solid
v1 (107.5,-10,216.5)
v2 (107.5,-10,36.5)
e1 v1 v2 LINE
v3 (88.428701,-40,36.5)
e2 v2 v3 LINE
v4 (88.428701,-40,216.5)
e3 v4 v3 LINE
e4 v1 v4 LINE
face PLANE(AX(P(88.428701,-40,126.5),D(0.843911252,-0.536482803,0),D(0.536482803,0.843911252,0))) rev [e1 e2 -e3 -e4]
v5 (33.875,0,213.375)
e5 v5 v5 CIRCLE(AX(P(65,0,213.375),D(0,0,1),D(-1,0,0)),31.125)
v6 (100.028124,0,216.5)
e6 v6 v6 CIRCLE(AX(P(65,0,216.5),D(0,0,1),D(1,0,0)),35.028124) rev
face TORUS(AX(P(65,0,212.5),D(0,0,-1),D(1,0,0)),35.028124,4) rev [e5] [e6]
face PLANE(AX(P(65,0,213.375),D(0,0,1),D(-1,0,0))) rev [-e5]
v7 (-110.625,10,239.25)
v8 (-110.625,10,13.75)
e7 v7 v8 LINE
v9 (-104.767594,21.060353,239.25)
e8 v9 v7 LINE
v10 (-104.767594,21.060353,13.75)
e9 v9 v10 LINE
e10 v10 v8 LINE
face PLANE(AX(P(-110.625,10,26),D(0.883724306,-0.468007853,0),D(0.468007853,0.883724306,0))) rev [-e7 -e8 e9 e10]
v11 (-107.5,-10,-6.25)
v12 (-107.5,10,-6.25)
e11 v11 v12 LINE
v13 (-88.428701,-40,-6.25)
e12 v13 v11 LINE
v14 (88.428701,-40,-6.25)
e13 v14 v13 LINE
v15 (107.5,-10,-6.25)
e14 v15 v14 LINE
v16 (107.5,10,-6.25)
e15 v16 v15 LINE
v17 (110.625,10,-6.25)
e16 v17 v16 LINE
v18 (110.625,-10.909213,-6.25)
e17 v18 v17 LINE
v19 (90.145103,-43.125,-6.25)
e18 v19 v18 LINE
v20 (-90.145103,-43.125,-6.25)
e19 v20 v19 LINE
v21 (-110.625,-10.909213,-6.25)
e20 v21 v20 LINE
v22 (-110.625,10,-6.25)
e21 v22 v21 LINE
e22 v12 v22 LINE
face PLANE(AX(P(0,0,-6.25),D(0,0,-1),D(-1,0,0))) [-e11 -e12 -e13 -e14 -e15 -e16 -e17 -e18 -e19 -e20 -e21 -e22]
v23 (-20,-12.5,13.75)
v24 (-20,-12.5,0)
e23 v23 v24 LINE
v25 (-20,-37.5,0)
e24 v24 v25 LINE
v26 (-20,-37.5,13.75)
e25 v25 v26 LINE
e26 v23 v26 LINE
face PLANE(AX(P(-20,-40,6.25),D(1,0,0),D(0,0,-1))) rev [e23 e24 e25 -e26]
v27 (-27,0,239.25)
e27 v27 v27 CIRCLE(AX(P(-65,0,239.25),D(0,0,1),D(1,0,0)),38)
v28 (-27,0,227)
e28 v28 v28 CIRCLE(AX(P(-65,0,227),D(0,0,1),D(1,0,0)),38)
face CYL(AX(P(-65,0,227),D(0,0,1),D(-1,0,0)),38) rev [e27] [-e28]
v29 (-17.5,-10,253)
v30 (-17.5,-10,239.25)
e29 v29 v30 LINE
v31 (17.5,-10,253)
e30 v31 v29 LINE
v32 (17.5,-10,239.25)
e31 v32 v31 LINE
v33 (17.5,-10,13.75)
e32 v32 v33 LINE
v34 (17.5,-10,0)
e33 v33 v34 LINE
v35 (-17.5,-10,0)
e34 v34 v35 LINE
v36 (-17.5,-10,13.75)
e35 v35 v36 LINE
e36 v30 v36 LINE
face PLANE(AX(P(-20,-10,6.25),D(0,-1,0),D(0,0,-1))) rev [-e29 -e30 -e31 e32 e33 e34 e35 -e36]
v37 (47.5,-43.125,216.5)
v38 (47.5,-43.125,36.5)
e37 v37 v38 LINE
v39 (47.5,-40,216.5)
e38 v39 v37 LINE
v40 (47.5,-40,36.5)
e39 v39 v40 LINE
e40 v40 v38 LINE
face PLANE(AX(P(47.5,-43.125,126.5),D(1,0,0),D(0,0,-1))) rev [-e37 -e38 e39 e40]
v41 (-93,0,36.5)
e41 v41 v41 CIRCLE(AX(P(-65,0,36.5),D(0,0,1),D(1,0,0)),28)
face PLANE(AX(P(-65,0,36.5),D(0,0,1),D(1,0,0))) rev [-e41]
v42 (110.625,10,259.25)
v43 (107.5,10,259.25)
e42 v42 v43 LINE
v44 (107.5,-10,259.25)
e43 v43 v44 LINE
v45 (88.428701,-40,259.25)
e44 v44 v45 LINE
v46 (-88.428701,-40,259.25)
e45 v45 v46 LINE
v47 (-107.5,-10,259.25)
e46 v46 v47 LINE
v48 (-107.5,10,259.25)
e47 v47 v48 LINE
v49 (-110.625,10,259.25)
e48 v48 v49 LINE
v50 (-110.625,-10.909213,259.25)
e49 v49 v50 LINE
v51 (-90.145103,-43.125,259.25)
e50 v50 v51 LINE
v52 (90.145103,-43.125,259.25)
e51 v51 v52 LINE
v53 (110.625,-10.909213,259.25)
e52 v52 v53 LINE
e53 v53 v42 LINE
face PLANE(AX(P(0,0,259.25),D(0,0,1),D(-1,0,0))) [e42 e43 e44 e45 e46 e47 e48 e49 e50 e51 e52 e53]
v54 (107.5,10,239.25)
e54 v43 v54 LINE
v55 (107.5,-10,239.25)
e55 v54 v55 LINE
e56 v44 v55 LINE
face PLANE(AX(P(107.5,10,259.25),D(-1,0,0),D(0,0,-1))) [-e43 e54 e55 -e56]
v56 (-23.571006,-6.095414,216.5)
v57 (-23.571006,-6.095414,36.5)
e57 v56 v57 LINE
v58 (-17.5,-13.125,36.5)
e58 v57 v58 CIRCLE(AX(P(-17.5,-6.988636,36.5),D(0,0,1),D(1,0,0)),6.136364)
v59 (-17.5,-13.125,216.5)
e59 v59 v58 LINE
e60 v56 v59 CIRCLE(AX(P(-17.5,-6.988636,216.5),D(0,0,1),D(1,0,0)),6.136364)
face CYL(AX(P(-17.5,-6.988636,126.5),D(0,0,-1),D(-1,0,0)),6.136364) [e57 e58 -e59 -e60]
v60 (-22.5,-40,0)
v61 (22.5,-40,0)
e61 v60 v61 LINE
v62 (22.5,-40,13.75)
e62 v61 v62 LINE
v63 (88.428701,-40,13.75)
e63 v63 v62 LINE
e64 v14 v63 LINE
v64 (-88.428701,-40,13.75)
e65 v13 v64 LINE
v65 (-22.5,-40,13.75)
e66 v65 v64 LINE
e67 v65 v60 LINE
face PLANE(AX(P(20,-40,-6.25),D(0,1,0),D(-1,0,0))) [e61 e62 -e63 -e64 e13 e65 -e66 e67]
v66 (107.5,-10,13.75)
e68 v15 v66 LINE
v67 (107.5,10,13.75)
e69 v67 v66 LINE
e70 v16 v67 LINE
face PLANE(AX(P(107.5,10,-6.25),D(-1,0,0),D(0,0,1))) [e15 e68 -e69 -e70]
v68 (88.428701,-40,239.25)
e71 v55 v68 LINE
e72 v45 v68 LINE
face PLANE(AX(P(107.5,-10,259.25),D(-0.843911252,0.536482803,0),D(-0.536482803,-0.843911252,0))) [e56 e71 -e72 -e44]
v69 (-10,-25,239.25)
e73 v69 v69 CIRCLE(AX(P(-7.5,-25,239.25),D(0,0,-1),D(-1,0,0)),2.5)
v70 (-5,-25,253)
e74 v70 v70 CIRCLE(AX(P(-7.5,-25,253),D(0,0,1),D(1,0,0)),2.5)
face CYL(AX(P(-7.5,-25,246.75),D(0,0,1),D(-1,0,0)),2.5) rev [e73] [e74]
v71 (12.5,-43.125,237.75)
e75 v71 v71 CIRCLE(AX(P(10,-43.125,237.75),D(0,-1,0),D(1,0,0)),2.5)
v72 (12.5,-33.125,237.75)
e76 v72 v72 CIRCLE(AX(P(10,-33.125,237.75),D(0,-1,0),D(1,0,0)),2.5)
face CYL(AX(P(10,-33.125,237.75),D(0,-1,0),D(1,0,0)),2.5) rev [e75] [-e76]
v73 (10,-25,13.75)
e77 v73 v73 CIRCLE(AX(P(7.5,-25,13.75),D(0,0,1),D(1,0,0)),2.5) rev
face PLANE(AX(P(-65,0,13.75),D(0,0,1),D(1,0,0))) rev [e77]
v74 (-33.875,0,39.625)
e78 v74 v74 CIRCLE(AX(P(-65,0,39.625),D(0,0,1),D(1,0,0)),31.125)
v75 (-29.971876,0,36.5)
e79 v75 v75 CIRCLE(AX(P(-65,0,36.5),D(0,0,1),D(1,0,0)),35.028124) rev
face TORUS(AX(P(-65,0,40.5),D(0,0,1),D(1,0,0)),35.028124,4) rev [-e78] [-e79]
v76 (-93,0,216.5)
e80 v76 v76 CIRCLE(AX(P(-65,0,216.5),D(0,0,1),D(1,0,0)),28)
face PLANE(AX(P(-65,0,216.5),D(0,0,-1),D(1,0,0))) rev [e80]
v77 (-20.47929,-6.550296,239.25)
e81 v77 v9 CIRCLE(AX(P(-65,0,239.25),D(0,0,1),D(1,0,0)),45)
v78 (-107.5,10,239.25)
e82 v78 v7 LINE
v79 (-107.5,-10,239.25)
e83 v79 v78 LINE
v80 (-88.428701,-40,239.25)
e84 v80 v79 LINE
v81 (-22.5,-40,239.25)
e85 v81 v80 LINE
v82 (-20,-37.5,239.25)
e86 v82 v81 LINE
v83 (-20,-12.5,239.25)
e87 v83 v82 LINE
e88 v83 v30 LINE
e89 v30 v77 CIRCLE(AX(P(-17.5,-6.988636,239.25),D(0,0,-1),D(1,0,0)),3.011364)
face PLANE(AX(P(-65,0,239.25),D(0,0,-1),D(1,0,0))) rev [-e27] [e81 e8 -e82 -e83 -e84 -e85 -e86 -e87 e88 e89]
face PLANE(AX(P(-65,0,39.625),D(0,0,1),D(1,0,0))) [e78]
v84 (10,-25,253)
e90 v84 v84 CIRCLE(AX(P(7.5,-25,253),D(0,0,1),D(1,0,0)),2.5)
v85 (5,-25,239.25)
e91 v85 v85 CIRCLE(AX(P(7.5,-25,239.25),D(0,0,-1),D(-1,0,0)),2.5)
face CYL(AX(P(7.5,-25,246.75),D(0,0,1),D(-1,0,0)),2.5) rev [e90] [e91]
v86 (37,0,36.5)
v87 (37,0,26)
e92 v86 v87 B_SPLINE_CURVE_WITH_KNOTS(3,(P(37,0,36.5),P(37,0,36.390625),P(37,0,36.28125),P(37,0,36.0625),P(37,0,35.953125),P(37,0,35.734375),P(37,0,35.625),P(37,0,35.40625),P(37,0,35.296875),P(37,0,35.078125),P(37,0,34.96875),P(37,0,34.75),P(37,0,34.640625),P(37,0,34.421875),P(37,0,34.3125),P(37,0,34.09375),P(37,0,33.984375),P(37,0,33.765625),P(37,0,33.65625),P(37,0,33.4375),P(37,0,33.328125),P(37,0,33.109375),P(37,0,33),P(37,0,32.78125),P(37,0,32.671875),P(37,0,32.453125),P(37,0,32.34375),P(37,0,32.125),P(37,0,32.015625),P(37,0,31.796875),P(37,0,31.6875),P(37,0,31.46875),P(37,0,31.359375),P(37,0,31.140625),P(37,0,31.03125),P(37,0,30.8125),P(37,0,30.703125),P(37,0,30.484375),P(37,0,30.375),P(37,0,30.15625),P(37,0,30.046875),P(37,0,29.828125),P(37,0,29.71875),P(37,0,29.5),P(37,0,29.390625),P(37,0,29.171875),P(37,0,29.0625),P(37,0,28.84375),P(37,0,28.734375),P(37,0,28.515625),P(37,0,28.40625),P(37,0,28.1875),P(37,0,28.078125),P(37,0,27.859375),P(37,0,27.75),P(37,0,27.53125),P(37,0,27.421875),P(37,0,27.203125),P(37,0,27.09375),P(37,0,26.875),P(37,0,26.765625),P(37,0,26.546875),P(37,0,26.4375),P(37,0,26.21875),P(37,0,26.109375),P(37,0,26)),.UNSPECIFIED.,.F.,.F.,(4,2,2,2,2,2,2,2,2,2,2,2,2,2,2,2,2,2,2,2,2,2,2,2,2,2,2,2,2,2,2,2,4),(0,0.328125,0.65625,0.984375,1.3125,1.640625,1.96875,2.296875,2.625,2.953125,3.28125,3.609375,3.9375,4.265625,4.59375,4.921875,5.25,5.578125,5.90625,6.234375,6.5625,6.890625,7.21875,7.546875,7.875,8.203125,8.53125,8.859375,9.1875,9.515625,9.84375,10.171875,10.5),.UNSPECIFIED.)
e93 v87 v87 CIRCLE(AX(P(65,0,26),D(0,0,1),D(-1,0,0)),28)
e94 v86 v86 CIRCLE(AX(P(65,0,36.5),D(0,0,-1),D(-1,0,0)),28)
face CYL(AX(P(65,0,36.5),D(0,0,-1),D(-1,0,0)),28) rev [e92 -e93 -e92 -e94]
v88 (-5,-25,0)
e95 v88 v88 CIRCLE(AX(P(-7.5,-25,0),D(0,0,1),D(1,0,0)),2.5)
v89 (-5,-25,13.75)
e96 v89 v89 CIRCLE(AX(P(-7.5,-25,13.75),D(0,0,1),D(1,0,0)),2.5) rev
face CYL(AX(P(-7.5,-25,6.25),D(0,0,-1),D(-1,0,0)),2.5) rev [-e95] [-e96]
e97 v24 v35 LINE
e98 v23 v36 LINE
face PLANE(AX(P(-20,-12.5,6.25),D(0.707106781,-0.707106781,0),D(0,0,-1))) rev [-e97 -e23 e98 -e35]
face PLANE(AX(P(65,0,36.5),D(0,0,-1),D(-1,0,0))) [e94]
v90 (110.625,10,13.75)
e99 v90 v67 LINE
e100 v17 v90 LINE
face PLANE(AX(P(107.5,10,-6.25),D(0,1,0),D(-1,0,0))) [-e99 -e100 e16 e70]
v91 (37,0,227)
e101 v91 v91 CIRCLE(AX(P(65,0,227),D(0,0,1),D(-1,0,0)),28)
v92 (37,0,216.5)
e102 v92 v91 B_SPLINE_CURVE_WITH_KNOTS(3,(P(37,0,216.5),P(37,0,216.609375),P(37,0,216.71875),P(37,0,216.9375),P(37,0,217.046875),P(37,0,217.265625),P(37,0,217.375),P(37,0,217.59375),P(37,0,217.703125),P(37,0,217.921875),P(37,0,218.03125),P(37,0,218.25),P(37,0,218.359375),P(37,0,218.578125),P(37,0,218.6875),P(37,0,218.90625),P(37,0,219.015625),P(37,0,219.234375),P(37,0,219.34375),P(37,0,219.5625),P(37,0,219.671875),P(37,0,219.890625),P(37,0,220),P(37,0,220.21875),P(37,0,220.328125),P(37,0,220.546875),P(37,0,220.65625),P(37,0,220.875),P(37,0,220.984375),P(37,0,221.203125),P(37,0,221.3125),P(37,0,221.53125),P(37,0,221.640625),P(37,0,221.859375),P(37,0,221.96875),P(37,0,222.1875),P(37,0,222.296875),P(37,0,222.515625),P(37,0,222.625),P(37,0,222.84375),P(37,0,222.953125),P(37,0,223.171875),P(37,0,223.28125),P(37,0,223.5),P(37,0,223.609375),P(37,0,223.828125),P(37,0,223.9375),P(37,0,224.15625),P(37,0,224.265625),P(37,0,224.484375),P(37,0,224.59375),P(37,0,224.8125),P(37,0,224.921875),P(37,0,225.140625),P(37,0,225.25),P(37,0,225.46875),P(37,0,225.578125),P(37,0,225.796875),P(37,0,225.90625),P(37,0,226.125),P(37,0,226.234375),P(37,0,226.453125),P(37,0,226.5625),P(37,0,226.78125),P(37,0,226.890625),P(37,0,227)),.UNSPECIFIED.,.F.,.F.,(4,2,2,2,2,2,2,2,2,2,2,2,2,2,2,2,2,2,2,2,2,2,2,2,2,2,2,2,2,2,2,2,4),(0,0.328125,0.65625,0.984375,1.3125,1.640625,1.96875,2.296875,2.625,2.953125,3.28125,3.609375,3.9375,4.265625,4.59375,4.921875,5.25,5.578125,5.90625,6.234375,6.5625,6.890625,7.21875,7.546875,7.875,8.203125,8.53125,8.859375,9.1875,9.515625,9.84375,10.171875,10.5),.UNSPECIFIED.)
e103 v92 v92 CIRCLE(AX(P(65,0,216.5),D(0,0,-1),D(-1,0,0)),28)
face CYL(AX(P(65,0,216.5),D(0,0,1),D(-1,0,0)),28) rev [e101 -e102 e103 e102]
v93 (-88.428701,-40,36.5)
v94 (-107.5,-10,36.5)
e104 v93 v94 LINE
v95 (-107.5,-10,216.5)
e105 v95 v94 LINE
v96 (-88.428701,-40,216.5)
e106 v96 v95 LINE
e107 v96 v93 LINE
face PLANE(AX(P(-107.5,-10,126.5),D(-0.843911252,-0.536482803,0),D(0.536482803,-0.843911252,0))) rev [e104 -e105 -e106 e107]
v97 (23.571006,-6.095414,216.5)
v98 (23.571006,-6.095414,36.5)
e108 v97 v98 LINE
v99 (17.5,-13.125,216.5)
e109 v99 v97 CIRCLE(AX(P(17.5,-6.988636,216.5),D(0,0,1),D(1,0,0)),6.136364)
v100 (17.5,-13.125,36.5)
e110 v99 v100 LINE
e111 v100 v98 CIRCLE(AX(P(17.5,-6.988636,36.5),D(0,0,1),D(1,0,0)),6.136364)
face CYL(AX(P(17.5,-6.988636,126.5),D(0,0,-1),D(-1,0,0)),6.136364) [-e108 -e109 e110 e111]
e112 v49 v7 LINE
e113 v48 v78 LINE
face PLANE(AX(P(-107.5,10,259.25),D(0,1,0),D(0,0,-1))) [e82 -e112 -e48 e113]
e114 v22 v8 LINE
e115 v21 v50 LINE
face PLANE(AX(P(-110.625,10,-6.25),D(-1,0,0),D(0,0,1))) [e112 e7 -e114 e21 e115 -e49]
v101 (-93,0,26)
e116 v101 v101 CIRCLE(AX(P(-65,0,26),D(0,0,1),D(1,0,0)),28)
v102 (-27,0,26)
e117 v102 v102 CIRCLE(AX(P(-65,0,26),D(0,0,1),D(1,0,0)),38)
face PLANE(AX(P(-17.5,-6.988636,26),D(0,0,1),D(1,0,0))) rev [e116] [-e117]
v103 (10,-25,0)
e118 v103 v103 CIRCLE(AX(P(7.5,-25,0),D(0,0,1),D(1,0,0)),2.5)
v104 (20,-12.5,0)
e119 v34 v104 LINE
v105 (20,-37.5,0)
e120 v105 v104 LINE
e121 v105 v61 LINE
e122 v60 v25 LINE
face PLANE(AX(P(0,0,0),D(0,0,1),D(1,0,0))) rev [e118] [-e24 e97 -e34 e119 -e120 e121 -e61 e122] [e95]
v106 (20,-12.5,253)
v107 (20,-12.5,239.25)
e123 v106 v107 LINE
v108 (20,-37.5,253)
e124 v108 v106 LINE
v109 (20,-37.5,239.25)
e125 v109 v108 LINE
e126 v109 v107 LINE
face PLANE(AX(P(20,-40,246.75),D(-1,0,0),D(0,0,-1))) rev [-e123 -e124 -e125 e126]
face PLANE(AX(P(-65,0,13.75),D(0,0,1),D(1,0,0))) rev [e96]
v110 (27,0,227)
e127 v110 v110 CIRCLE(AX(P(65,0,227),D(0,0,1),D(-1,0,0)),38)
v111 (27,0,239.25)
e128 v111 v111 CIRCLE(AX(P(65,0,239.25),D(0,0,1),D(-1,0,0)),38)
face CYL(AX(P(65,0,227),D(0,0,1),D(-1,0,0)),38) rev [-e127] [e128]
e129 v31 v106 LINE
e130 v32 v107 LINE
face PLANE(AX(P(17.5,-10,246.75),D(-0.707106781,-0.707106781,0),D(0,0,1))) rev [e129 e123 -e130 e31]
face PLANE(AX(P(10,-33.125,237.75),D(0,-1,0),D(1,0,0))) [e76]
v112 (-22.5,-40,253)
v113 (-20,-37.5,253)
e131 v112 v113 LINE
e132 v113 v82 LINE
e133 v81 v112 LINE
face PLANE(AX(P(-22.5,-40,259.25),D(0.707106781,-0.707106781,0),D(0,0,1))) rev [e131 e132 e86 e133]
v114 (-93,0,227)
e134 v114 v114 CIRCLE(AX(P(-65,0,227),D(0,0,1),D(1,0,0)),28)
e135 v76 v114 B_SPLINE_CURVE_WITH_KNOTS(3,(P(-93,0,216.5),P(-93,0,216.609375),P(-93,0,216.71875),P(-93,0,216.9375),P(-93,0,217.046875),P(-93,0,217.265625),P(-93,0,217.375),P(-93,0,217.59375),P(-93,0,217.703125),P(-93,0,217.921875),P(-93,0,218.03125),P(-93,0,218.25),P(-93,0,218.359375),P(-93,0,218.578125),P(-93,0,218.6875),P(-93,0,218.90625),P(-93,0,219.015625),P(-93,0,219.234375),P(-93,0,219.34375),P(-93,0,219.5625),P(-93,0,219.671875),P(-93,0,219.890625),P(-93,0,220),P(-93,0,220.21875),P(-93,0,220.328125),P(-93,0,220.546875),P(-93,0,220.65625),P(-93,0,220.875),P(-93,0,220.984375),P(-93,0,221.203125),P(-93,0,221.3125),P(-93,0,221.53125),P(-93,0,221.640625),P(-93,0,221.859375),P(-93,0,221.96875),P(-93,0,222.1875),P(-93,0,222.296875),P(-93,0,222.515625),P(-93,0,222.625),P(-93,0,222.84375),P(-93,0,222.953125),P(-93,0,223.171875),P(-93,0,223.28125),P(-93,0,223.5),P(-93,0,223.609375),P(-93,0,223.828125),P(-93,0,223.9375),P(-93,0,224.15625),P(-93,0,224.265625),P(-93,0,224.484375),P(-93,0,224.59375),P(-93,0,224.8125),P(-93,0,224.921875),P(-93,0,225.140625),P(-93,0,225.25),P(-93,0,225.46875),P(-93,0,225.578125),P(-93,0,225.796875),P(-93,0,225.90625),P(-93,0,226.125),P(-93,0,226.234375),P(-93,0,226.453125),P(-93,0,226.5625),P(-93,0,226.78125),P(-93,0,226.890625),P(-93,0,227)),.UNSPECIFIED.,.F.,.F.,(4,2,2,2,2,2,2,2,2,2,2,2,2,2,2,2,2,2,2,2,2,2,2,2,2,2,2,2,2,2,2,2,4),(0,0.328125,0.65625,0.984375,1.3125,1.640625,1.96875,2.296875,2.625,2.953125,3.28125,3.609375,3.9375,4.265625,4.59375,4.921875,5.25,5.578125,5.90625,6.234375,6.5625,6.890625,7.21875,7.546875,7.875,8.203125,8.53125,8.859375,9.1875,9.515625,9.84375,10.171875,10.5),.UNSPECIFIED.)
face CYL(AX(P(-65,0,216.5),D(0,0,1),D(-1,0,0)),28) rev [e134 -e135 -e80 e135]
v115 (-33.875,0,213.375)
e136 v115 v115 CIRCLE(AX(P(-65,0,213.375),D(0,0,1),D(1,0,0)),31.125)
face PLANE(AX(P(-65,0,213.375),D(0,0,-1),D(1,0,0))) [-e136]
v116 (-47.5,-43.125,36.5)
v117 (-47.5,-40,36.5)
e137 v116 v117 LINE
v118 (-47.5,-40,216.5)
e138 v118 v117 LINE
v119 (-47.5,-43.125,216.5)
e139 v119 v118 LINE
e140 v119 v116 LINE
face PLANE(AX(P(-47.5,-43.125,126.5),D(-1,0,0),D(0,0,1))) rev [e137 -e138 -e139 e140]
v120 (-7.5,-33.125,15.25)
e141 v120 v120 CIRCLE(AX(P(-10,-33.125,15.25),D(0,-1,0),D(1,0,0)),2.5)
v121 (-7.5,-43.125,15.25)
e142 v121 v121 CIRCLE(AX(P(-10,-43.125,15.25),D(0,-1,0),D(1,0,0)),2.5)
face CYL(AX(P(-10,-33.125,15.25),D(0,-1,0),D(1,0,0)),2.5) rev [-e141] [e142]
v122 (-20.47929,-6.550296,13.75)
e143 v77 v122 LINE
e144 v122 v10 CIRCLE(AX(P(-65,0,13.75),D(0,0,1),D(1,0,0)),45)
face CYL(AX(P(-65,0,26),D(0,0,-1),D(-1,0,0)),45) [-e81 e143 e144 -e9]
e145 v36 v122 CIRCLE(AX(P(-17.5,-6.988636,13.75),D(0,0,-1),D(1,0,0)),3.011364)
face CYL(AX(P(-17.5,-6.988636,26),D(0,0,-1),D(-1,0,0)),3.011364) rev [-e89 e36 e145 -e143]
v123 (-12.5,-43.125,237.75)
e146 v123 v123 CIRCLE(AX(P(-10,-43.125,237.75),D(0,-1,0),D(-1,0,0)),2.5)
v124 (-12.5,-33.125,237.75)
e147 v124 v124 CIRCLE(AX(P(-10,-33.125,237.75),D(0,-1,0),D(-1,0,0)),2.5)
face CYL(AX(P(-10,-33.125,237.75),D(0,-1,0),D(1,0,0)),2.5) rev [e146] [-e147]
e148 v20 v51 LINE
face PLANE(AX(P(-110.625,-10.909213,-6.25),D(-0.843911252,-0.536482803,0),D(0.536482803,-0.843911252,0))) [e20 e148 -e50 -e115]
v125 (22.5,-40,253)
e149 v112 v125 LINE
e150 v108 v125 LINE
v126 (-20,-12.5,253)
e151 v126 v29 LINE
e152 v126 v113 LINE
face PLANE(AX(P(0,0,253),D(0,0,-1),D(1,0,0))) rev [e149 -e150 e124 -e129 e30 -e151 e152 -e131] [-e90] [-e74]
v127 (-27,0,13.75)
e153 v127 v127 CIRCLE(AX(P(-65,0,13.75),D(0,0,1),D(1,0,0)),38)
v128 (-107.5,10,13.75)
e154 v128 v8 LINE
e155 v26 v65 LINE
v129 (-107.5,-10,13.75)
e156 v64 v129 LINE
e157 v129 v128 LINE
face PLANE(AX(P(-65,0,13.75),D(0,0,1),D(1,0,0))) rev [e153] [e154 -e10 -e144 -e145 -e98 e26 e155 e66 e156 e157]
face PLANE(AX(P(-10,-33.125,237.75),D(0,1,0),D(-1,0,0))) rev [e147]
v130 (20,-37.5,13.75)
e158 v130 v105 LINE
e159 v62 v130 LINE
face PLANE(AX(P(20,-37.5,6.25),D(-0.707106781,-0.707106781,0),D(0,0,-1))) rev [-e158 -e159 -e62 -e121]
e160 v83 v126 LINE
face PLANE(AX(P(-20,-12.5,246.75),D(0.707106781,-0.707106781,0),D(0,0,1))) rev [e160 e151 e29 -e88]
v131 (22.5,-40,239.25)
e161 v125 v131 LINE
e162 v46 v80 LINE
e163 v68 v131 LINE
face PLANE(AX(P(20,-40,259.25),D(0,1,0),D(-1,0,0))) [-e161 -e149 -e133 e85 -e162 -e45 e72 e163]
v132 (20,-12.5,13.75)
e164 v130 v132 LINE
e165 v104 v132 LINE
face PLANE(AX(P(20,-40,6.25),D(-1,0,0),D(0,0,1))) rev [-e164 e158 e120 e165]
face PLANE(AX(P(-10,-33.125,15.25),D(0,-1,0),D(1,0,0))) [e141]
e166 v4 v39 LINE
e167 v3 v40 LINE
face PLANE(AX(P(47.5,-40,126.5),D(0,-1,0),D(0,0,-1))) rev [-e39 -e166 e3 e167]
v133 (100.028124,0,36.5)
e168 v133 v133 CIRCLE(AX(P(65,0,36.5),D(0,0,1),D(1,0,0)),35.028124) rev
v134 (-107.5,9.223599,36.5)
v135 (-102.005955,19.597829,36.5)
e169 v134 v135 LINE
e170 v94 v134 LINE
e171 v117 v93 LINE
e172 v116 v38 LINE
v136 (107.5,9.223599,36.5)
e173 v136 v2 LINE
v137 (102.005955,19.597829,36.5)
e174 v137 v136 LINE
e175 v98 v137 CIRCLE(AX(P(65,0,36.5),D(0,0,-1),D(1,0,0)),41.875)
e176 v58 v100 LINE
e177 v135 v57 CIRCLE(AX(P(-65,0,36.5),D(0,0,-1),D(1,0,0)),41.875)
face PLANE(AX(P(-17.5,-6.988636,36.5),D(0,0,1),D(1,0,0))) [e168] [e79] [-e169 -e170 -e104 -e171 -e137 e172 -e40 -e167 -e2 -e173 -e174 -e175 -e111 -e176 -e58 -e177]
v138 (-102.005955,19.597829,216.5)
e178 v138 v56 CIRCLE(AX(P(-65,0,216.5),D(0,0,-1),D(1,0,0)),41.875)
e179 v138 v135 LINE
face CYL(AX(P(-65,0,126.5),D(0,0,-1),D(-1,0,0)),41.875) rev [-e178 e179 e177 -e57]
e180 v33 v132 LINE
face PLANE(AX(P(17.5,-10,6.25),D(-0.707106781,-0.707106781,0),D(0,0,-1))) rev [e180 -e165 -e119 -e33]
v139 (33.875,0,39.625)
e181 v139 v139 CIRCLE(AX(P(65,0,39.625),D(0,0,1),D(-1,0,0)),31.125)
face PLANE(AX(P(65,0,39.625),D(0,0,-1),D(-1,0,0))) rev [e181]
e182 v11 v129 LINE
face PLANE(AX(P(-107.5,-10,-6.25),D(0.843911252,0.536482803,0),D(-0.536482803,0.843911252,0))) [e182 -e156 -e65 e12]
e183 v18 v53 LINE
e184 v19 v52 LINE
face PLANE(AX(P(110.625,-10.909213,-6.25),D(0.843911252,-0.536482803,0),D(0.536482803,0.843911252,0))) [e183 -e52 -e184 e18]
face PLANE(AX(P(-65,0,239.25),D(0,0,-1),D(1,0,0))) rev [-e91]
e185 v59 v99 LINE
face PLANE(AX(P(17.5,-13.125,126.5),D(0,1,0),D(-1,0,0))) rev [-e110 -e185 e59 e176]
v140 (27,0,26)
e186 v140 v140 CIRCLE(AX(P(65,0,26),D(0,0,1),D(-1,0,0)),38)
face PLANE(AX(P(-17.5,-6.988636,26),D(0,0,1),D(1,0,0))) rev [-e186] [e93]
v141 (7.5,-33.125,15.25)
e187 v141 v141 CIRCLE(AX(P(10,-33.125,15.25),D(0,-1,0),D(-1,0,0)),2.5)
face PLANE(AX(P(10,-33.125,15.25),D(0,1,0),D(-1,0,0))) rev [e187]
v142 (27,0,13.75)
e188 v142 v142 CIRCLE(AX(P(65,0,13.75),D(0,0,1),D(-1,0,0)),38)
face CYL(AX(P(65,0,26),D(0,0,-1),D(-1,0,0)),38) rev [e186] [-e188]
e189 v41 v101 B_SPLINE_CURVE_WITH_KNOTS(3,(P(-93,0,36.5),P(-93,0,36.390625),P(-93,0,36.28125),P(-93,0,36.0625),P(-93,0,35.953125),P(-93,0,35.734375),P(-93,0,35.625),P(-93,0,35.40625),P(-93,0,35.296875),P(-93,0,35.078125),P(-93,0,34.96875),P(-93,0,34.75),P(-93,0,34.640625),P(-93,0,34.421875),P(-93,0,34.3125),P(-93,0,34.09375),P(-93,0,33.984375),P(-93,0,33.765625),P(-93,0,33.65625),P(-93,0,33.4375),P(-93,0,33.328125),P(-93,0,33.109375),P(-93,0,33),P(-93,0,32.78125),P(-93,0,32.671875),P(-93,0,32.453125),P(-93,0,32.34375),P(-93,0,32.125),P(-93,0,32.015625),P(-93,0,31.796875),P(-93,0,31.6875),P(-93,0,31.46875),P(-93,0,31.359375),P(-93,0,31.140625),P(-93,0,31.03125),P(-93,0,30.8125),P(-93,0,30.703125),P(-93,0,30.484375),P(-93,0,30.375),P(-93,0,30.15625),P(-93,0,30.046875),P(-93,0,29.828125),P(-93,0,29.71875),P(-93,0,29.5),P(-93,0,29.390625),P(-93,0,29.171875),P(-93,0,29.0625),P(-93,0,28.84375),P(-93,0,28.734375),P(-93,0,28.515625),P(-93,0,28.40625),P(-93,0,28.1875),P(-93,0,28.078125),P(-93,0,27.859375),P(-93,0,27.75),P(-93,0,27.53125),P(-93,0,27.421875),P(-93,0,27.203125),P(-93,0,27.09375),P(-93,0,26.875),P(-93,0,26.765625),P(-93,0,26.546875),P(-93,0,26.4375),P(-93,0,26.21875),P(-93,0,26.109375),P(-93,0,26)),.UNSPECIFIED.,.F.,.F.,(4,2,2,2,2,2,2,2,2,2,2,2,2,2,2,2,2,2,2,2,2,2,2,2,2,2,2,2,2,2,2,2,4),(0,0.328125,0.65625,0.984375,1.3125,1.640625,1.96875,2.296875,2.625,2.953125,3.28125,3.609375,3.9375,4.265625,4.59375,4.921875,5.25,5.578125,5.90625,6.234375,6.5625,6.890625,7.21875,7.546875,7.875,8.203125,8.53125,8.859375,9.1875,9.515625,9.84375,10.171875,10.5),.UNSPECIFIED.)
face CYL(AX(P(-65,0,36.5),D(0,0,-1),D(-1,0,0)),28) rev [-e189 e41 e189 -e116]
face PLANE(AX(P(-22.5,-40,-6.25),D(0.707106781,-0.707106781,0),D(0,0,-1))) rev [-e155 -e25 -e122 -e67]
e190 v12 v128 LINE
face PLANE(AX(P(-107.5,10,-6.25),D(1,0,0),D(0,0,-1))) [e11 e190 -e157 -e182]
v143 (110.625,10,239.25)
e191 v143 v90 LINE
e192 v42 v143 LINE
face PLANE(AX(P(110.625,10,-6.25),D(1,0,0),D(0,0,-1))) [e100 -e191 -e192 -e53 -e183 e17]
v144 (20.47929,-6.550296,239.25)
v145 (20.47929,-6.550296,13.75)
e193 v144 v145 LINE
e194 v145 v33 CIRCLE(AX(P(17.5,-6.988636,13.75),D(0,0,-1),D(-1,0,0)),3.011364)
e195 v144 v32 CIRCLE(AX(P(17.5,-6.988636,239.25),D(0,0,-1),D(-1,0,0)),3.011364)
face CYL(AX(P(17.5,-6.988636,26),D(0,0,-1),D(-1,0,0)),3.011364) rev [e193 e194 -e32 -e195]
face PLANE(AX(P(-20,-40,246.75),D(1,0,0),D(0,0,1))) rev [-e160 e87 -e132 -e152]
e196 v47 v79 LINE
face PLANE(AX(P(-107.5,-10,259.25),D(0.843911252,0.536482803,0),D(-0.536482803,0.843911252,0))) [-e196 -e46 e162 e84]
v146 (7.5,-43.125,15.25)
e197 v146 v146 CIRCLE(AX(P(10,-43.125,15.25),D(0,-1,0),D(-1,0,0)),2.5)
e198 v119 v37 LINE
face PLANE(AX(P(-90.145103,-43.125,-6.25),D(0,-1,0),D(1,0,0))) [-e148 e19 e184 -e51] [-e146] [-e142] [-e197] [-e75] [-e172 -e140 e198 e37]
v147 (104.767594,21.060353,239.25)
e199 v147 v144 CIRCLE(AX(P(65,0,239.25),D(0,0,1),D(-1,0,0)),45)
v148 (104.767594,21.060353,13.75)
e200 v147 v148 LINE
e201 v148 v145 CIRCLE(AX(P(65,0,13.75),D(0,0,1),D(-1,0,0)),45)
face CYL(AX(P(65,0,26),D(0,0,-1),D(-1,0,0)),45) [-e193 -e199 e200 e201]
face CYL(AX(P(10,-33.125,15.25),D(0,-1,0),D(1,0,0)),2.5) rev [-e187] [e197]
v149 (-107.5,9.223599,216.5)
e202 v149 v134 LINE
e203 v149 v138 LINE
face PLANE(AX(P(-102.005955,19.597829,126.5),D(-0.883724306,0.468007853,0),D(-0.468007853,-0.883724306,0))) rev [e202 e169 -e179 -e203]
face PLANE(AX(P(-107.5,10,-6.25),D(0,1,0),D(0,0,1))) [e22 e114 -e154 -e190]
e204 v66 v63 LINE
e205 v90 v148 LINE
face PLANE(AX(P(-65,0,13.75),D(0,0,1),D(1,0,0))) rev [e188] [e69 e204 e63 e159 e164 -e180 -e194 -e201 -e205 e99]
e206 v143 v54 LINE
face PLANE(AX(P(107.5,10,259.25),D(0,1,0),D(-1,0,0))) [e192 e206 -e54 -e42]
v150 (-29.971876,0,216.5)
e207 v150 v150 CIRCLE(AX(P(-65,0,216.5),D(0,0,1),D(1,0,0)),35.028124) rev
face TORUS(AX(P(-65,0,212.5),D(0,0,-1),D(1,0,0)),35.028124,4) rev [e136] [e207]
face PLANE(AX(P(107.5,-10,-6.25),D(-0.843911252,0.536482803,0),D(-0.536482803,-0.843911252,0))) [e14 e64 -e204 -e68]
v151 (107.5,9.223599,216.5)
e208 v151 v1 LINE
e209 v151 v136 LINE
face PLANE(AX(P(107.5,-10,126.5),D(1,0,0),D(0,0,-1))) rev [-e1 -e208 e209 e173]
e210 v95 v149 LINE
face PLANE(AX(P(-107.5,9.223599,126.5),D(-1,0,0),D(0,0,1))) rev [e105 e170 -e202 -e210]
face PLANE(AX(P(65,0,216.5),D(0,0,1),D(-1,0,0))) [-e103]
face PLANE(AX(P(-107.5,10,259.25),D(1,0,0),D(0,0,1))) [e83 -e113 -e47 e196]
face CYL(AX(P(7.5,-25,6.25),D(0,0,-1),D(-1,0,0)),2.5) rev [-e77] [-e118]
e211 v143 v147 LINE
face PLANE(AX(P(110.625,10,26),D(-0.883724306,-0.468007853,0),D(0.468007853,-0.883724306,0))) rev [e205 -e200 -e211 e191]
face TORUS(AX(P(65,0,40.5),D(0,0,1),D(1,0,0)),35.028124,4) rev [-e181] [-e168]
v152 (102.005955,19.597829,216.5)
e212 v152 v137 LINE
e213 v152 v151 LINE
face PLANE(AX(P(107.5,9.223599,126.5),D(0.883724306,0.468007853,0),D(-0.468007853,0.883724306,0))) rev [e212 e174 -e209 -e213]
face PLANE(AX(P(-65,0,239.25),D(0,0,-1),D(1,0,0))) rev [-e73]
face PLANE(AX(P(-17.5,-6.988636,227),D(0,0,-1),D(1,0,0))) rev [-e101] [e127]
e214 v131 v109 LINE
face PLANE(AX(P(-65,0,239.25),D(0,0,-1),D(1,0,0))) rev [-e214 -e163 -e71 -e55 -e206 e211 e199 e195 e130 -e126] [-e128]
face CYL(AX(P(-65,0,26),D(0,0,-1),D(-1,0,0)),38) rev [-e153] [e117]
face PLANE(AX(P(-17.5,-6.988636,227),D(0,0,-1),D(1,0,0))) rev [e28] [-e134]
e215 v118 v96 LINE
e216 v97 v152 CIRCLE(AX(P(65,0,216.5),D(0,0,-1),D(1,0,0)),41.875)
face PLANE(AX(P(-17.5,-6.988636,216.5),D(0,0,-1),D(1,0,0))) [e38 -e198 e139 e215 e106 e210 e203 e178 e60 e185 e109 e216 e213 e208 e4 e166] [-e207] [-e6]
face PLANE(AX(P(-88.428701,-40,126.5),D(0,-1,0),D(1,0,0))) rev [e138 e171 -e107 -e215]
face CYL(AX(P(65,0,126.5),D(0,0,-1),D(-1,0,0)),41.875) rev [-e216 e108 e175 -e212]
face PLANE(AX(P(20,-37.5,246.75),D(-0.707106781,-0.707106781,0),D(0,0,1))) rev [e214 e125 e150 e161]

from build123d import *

# Parameters (mm, degrees)
SKETCH3_W                = 40
SKETCH3_H                = 30
SKETCH3_R                = 2.5
BOSS_EXTRUDE2_DEPTH      = 6.25
SKETCH4_W                = 40
SKETCH4_H                = 6.25
BOSS_EXTRUDE3_DEPTH      = 7.5
BOSS_EXTRUDE4_DEPTH      = 20
CHAMFER1_SIZE            = 2.5
SKETCH6_R                = 38
BOSS_EXTRUDE5_DEPTH      = 12.25
SKETCH8_R                = 28
BOSS_EXTRUDE7_DEPTH      = 10.5
SKETCH9_R                = 31.125
BOSS_EXTRUDE8_DEPTH      = 3.125
FILLET1_R                = 4
BOSS_EXTRUDE9_DEPTH      = 90
CHAMFER1_OF_MIRROR1_SIZE = 2.5
FILLET1_OF_MIRROR1_R     = 4
SKETCH12_R               = 2.5
BOSS_EXTRUDE10_DEPTH     = 30
SKETCH14_R               = 2.5
CUT_EXTRUDE1_DEPTH       = 10


with BuildPart() as part:
    # Sketch3 → Boss-Extrude2 (new body)
    with BuildSketch(Plane.XY):
        with Locations((0, -25)):
            Rectangle(SKETCH3_W, SKETCH3_H)
        with Locations((7.5, -25)):
            Circle(SKETCH3_R, mode=Mode.SUBTRACT)
        with Locations((-7.5, -25)):
            Circle(SKETCH3_R, mode=Mode.SUBTRACT)
    boss_extrude2 = extrude(amount=BOSS_EXTRUDE2_DEPTH)

    # Sketch4 → Boss-Extrude3 (add)
    with BuildSketch(Plane.XY.offset(6.25)):
        with Locations((0, -36.875)):
            Rectangle(SKETCH4_W, SKETCH4_H)
    boss_extrude3 = extrude(amount=BOSS_EXTRUDE3_DEPTH)

    # Sketch5 → Boss-Extrude4 (add)
    with BuildSketch(Plane.XY.offset(13.75)):
        Polygon((-20, -40), (-88.428700673, -40), (-107.5, -10), (-107.5, 10), (-110.625, 10), (-110.625, -10.909213368), (-90.145103003, -43.125), (90.145103003, -43.125), (110.625, -10.909213368), (110.625, 10), (107.5, 10), (107.5, -10), (88.428700673, -40), (20, -40), align=None)
    boss_extrude4 = extrude(amount=-BOSS_EXTRUDE4_DEPTH)

    # Chamfer1
    chamfer1_edges = [part.edges().sort_by_distance(p)[0] for p in [
        (-20, -40, 6.875),
        (-20, -10, 3.125),
        (20, -10, 3.125),
        (20, -40, 6.875),
    ]]
    chamfer(chamfer1_edges, length=CHAMFER1_SIZE)

    # Sketch6 → Boss-Extrude5 (add)
    with BuildSketch(Plane.XY.offset(13.75)):
        with BuildLine():
            Line((-110.625, 10), (-104.767593775, 21.060353399))
            ThreePointArc((-104.767593775, 21.060353399), (-50.991609061, 42.764061819), (-20.479289941, -6.550295858))
            ThreePointArc((-20.479289941, -6.550295858), (-19.779069285, -8.956923473), (-17.5, -10))
            Line((-17.5, -10), (17.5, -10))
            ThreePointArc((17.5, -10), (19.779069285, -8.956923473), (20.479289941, -6.550295858))
            ThreePointArc((20.479289941, -6.550295858), (50.991609061, 42.764061819), (104.767593775, 21.060353399))
            Line((104.767593775, 21.060353399), (110.625, 10))
            Line((110.625, 10), (110.625, -10.909213368))
            Line((110.625, -10.909213368), (90.145103003, -43.125))
            Line((90.145103003, -43.125), (-90.145103003, -43.125))
            Line((-90.145103003, -43.125), (-110.625, -10.909213368))
            Line((-110.625, -10.909213368), (-110.625, 10))
        make_face()
        with Locations((-65, 0)):
            Circle(SKETCH6_R, mode=Mode.SUBTRACT)
        with Locations(Location((65, 0, 0), (0, 0, 180))):
            Circle(SKETCH6_R, mode=Mode.SUBTRACT)
    boss_extrude5 = extrude(amount=BOSS_EXTRUDE5_DEPTH)

    # Sketch8 → Boss-Extrude7 (add)
    with BuildSketch(Plane.XY.offset(26)):
        with BuildLine():
            Line((-104.767593775, 21.060353399), (-110.625, 10))
            Line((-110.625, 10), (-110.625, -10.909213368))
            Line((-110.625, -10.909213368), (-90.145103003, -43.125))
            Line((-90.145103003, -43.125), (90.145103003, -43.125))
            Line((90.145103003, -43.125), (110.625, -10.909213368))
            Line((110.625, -10.909213368), (110.625, 10))
            Line((110.625, 10), (104.767593775, 21.060353399))
            ThreePointArc((104.767593775, 21.060353399), (50.991609061, 42.764061819), (20.479289941, -6.550295858))
            ThreePointArc((20.479289941, -6.550295858), (19.779069285, -8.956923473), (17.5, -10))
            Line((17.5, -10), (-17.5, -10))
            ThreePointArc((-17.5, -10), (-19.779069285, -8.956923473), (-20.479289941, -6.550295858))
            ThreePointArc((-20.479289941, -6.550295858), (-50.991609061, 42.764061819), (-104.767593775, 21.060353399))
        make_face()
        with Locations(Location((-65, 0, 0), (0, 0, 180))):
            Circle(SKETCH8_R, mode=Mode.SUBTRACT)
        with Locations(Location((65, 0, 0), (0, 0, 180))):
            Circle(SKETCH8_R, mode=Mode.SUBTRACT)
    boss_extrude7 = extrude(amount=BOSS_EXTRUDE7_DEPTH)

    # Sketch9 → Boss-Extrude8 (add)
    with BuildSketch(Plane.XY.offset(36.5)):
        with Locations(Location((65, 0, 0), (0, 0, 180))):
            Circle(SKETCH9_R)
        with Locations((-65, 0)):
            Circle(SKETCH9_R)
    boss_extrude8 = extrude(amount=BOSS_EXTRUDE8_DEPTH)

    # Fillet1
    # the kernel refuses this fillet: 4 mm, written as the material it adds along each edge
    with BuildSketch(Plane(origin=(-65, 0, 36.5), x_dir=(1, 0, 0), z_dir=(0, -1, 0))) as fillet1_piece_1:
        with BuildLine():
            CenterArc((35.028123749, 4), FILLET1_R, 192.635625093, 77.364374907)
            Line((31.125, 3.125), (31.046937525, 3.1075))
            ThreePointArc((31.046937525, 3.1075), (31.045, 1.5625), (31.045, 0))
            Line((31.045, 0), (31.125, -0.08))
            Line((31.125, -0.08), (35.028123749, -0.08))
            Line((35.028123749, -0.08), (35.028123749, 0))
        make_face()
    revolve(axis=Axis((-65, 0, 36.5), (0, 0, 1)))
    with BuildSketch(Plane(origin=(65, 0, 36.5), x_dir=(-1, 0, 0), z_dir=(0, 1, 0))) as fillet1_piece_2:
        with BuildLine():
            CenterArc((35.028123749, 4), FILLET1_R, 192.635625093, 77.364374907)
            Line((31.125, 3.125), (31.046937525, 3.1075))
            ThreePointArc((31.046937525, 3.1075), (31.045, 1.5625), (31.045, 0))
            Line((31.045, 0), (31.125, -0.08))
            Line((31.125, -0.08), (35.028123749, -0.08))
            Line((35.028123749, -0.08), (35.028123749, 0))
        make_face()
    revolve(axis=Axis((65, 0, 36.5), (0, 0, 1)))

    # Sketch10 → Boss-Extrude9 (add)
    with BuildSketch(Plane.XY.offset(36.5)):
        with BuildLine():
            Line((-104.767593775, 21.060353399), (-110.625, 10))
            Line((-110.625, 10), (-110.625, -10.909213368))
            Line((-110.625, -10.909213368), (-90.145103003, -43.125))
            Line((-90.145103003, -43.125), (-47.5, -43.125))
            Line((-47.5, -43.125), (-47.5, -40))
            Line((-47.5, -40), (-88.428700673, -40))
            Line((-88.428700673, -40), (-107.5, -10))
            Line((-107.5, -10), (-107.5, 9.223599474))
            Line((-107.5, 9.223599474), (-102.005955319, 19.597828858))
            ThreePointArc((-102.005955319, 19.597828858), (-51.964413987, 39.794335304), (-23.571005917, -6.095414201))
            ThreePointArc((-23.571005917, -6.095414201), (-22.144141184, -10.999485568), (-17.5, -13.125))
            Line((-17.5, -13.125), (17.5, -13.125))
            ThreePointArc((17.5, -13.125), (22.144141184, -10.999485568), (23.571005917, -6.095414201))
            ThreePointArc((23.571005917, -6.095414201), (51.964413987, 39.794335304), (102.005955319, 19.597828858))
            Line((102.005955319, 19.597828858), (107.5, 9.223599474))
            Line((107.5, 9.223599474), (107.5, -10))
            Line((107.5, -10), (88.428700673, -40))
            Line((88.428700673, -40), (47.5, -40))
            Line((47.5, -40), (47.5, -43.125))
            Line((47.5, -43.125), (90.145103003, -43.125))
            Line((90.145103003, -43.125), (110.625, -10.909213368))
            Line((110.625, -10.909213368), (110.625, 10))
            Line((110.625, 10), (104.767593775, 21.060353399))
            ThreePointArc((104.767593775, 21.060353399), (50.991609061, 42.764061819), (20.479289941, -6.550295858))
            ThreePointArc((20.479289941, -6.550295858), (19.779069285, -8.956923473), (17.5, -10))
            Line((17.5, -10), (-17.5, -10))
            ThreePointArc((-17.5, -10), (-19.779069285, -8.956923473), (-20.479289941, -6.550295858))
            ThreePointArc((-20.479289941, -6.550295858), (-50.991609061, 42.764061819), (-104.767593775, 21.060353399))
        make_face()
    boss_extrude9 = extrude(amount=BOSS_EXTRUDE9_DEPTH)

    # Mirror1: Boss-Extrude2, Boss-Extrude3, Boss-Extrude4, Boss-Extrude5, Boss-Extrude7, Boss-Extrude8, Boss-Extrude9 across plane
    add(boss_extrude2.mirror(Plane(origin=(-65, 0, 126.5), x_dir=(1, 0, 0), z_dir=(0, 0, 1))))
    add(boss_extrude3.mirror(Plane(origin=(-65, 0, 126.5), x_dir=(1, 0, 0), z_dir=(0, 0, 1))))
    add(boss_extrude4.mirror(Plane(origin=(-65, 0, 126.5), x_dir=(1, 0, 0), z_dir=(0, 0, 1))))
    add(boss_extrude5.mirror(Plane(origin=(-65, 0, 126.5), x_dir=(1, 0, 0), z_dir=(0, 0, 1))))
    add(boss_extrude7.mirror(Plane(origin=(-65, 0, 126.5), x_dir=(1, 0, 0), z_dir=(0, 0, 1))))
    add(boss_extrude8.mirror(Plane(origin=(-65, 0, 126.5), x_dir=(1, 0, 0), z_dir=(0, 0, 1))))
    add(boss_extrude9.mirror(Plane(origin=(-65, 0, 126.5), x_dir=(1, 0, 0), z_dir=(0, 0, 1))))

    # Chamfer1 of Mirror1
    chamfer1_of_mirror1_edges = [part.edges().sort_by_distance(p)[0] for p in [
        (-20, -40, 246.125),
        (-20, -10, 249.875),
        (20, -10, 249.875),
        (20, -40, 246.125),
    ]]
    chamfer(chamfer1_of_mirror1_edges, length=CHAMFER1_OF_MIRROR1_SIZE)

    # Fillet1 of Mirror1
    # the kernel refuses this fillet: 4 mm, written as the material it adds along each edge
    with BuildSketch(Plane(origin=(-65, 0, 216.5), x_dir=(1, 0, 0), z_dir=(0, -1, 0))) as fillet1_of_mirror1_piece_1:
        with BuildLine():
            CenterArc((35.028123749, -4), FILLET1_OF_MIRROR1_R, 90, 77.364374907)
            Line((31.125, -3.125), (31.046937525, -3.1075))
            ThreePointArc((31.046937525, -3.1075), (31.045, -1.5625), (31.045, 0))
            Line((31.045, 0), (31.125, 0.08))
            Line((31.125, 0.08), (35.028123749, 0.08))
            Line((35.028123749, 0.08), (35.028123749, 0))
        make_face()
    revolve(axis=Axis((-65, 0, 216.5), (0, 0, 1)))
    with BuildSketch(Plane(origin=(65, 0, 216.5), x_dir=(-1, 0, 0), z_dir=(0, 1, 0))) as fillet1_of_mirror1_piece_2:
        with BuildLine():
            CenterArc((35.028123749, -4), FILLET1_OF_MIRROR1_R, 90, 77.364374907)
            Line((31.125, -3.125), (31.046937525, -3.1075))
            ThreePointArc((31.046937525, -3.1075), (31.045, -1.5625), (31.045, 0))
            Line((31.045, 0), (31.125, 0.08))
            Line((31.125, 0.08), (35.028123749, 0.08))
            Line((35.028123749, 0.08), (35.028123749, 0))
        make_face()
    revolve(axis=Axis((65, 0, 216.5), (0, 0, 1)))

    # Sketch12 → Boss-Extrude10 (add)
    with BuildSketch(Plane.XY.offset(253)):
        Polygon((-20, -12.5), (-20, -37.5), (-22.5, -40), (22.5, -40), (20, -37.5), (20, -12.5), (17.5, -10), (-17.5, -10), align=None)
        with Locations((7.5, -25)):
            Circle(SKETCH12_R, mode=Mode.SUBTRACT)
        with Locations((-7.5, -25)):
            Circle(SKETCH12_R, mode=Mode.SUBTRACT)
    boss_extrude10 = extrude(amount=-BOSS_EXTRUDE10_DEPTH)

    # Mirror2: Boss-Extrude10 across plane
    add(boss_extrude10.mirror(Plane(origin=(0, 0, 126.5), x_dir=(1, 0, 0), z_dir=(0, 0, -1))))

    # Sketch14 → Cut-Extrude1 (cut)
    with BuildSketch(Plane.XZ.offset(43.125)):
        with Locations((10, 237.75)):
            Circle(SKETCH14_R)
        with Locations(Location((-10, 237.75, 0), (0, 0, 180))):
            Circle(SKETCH14_R)
        with Locations((-10, 15.25)):
            Circle(SKETCH14_R)
        with Locations(Location((10, 15.25, 0), (0, 0, 180))):
            Circle(SKETCH14_R)
    extrude(amount=-CUT_EXTRUDE1_DEPTH, mode=Mode.SUBTRACT)


solid = part.part
